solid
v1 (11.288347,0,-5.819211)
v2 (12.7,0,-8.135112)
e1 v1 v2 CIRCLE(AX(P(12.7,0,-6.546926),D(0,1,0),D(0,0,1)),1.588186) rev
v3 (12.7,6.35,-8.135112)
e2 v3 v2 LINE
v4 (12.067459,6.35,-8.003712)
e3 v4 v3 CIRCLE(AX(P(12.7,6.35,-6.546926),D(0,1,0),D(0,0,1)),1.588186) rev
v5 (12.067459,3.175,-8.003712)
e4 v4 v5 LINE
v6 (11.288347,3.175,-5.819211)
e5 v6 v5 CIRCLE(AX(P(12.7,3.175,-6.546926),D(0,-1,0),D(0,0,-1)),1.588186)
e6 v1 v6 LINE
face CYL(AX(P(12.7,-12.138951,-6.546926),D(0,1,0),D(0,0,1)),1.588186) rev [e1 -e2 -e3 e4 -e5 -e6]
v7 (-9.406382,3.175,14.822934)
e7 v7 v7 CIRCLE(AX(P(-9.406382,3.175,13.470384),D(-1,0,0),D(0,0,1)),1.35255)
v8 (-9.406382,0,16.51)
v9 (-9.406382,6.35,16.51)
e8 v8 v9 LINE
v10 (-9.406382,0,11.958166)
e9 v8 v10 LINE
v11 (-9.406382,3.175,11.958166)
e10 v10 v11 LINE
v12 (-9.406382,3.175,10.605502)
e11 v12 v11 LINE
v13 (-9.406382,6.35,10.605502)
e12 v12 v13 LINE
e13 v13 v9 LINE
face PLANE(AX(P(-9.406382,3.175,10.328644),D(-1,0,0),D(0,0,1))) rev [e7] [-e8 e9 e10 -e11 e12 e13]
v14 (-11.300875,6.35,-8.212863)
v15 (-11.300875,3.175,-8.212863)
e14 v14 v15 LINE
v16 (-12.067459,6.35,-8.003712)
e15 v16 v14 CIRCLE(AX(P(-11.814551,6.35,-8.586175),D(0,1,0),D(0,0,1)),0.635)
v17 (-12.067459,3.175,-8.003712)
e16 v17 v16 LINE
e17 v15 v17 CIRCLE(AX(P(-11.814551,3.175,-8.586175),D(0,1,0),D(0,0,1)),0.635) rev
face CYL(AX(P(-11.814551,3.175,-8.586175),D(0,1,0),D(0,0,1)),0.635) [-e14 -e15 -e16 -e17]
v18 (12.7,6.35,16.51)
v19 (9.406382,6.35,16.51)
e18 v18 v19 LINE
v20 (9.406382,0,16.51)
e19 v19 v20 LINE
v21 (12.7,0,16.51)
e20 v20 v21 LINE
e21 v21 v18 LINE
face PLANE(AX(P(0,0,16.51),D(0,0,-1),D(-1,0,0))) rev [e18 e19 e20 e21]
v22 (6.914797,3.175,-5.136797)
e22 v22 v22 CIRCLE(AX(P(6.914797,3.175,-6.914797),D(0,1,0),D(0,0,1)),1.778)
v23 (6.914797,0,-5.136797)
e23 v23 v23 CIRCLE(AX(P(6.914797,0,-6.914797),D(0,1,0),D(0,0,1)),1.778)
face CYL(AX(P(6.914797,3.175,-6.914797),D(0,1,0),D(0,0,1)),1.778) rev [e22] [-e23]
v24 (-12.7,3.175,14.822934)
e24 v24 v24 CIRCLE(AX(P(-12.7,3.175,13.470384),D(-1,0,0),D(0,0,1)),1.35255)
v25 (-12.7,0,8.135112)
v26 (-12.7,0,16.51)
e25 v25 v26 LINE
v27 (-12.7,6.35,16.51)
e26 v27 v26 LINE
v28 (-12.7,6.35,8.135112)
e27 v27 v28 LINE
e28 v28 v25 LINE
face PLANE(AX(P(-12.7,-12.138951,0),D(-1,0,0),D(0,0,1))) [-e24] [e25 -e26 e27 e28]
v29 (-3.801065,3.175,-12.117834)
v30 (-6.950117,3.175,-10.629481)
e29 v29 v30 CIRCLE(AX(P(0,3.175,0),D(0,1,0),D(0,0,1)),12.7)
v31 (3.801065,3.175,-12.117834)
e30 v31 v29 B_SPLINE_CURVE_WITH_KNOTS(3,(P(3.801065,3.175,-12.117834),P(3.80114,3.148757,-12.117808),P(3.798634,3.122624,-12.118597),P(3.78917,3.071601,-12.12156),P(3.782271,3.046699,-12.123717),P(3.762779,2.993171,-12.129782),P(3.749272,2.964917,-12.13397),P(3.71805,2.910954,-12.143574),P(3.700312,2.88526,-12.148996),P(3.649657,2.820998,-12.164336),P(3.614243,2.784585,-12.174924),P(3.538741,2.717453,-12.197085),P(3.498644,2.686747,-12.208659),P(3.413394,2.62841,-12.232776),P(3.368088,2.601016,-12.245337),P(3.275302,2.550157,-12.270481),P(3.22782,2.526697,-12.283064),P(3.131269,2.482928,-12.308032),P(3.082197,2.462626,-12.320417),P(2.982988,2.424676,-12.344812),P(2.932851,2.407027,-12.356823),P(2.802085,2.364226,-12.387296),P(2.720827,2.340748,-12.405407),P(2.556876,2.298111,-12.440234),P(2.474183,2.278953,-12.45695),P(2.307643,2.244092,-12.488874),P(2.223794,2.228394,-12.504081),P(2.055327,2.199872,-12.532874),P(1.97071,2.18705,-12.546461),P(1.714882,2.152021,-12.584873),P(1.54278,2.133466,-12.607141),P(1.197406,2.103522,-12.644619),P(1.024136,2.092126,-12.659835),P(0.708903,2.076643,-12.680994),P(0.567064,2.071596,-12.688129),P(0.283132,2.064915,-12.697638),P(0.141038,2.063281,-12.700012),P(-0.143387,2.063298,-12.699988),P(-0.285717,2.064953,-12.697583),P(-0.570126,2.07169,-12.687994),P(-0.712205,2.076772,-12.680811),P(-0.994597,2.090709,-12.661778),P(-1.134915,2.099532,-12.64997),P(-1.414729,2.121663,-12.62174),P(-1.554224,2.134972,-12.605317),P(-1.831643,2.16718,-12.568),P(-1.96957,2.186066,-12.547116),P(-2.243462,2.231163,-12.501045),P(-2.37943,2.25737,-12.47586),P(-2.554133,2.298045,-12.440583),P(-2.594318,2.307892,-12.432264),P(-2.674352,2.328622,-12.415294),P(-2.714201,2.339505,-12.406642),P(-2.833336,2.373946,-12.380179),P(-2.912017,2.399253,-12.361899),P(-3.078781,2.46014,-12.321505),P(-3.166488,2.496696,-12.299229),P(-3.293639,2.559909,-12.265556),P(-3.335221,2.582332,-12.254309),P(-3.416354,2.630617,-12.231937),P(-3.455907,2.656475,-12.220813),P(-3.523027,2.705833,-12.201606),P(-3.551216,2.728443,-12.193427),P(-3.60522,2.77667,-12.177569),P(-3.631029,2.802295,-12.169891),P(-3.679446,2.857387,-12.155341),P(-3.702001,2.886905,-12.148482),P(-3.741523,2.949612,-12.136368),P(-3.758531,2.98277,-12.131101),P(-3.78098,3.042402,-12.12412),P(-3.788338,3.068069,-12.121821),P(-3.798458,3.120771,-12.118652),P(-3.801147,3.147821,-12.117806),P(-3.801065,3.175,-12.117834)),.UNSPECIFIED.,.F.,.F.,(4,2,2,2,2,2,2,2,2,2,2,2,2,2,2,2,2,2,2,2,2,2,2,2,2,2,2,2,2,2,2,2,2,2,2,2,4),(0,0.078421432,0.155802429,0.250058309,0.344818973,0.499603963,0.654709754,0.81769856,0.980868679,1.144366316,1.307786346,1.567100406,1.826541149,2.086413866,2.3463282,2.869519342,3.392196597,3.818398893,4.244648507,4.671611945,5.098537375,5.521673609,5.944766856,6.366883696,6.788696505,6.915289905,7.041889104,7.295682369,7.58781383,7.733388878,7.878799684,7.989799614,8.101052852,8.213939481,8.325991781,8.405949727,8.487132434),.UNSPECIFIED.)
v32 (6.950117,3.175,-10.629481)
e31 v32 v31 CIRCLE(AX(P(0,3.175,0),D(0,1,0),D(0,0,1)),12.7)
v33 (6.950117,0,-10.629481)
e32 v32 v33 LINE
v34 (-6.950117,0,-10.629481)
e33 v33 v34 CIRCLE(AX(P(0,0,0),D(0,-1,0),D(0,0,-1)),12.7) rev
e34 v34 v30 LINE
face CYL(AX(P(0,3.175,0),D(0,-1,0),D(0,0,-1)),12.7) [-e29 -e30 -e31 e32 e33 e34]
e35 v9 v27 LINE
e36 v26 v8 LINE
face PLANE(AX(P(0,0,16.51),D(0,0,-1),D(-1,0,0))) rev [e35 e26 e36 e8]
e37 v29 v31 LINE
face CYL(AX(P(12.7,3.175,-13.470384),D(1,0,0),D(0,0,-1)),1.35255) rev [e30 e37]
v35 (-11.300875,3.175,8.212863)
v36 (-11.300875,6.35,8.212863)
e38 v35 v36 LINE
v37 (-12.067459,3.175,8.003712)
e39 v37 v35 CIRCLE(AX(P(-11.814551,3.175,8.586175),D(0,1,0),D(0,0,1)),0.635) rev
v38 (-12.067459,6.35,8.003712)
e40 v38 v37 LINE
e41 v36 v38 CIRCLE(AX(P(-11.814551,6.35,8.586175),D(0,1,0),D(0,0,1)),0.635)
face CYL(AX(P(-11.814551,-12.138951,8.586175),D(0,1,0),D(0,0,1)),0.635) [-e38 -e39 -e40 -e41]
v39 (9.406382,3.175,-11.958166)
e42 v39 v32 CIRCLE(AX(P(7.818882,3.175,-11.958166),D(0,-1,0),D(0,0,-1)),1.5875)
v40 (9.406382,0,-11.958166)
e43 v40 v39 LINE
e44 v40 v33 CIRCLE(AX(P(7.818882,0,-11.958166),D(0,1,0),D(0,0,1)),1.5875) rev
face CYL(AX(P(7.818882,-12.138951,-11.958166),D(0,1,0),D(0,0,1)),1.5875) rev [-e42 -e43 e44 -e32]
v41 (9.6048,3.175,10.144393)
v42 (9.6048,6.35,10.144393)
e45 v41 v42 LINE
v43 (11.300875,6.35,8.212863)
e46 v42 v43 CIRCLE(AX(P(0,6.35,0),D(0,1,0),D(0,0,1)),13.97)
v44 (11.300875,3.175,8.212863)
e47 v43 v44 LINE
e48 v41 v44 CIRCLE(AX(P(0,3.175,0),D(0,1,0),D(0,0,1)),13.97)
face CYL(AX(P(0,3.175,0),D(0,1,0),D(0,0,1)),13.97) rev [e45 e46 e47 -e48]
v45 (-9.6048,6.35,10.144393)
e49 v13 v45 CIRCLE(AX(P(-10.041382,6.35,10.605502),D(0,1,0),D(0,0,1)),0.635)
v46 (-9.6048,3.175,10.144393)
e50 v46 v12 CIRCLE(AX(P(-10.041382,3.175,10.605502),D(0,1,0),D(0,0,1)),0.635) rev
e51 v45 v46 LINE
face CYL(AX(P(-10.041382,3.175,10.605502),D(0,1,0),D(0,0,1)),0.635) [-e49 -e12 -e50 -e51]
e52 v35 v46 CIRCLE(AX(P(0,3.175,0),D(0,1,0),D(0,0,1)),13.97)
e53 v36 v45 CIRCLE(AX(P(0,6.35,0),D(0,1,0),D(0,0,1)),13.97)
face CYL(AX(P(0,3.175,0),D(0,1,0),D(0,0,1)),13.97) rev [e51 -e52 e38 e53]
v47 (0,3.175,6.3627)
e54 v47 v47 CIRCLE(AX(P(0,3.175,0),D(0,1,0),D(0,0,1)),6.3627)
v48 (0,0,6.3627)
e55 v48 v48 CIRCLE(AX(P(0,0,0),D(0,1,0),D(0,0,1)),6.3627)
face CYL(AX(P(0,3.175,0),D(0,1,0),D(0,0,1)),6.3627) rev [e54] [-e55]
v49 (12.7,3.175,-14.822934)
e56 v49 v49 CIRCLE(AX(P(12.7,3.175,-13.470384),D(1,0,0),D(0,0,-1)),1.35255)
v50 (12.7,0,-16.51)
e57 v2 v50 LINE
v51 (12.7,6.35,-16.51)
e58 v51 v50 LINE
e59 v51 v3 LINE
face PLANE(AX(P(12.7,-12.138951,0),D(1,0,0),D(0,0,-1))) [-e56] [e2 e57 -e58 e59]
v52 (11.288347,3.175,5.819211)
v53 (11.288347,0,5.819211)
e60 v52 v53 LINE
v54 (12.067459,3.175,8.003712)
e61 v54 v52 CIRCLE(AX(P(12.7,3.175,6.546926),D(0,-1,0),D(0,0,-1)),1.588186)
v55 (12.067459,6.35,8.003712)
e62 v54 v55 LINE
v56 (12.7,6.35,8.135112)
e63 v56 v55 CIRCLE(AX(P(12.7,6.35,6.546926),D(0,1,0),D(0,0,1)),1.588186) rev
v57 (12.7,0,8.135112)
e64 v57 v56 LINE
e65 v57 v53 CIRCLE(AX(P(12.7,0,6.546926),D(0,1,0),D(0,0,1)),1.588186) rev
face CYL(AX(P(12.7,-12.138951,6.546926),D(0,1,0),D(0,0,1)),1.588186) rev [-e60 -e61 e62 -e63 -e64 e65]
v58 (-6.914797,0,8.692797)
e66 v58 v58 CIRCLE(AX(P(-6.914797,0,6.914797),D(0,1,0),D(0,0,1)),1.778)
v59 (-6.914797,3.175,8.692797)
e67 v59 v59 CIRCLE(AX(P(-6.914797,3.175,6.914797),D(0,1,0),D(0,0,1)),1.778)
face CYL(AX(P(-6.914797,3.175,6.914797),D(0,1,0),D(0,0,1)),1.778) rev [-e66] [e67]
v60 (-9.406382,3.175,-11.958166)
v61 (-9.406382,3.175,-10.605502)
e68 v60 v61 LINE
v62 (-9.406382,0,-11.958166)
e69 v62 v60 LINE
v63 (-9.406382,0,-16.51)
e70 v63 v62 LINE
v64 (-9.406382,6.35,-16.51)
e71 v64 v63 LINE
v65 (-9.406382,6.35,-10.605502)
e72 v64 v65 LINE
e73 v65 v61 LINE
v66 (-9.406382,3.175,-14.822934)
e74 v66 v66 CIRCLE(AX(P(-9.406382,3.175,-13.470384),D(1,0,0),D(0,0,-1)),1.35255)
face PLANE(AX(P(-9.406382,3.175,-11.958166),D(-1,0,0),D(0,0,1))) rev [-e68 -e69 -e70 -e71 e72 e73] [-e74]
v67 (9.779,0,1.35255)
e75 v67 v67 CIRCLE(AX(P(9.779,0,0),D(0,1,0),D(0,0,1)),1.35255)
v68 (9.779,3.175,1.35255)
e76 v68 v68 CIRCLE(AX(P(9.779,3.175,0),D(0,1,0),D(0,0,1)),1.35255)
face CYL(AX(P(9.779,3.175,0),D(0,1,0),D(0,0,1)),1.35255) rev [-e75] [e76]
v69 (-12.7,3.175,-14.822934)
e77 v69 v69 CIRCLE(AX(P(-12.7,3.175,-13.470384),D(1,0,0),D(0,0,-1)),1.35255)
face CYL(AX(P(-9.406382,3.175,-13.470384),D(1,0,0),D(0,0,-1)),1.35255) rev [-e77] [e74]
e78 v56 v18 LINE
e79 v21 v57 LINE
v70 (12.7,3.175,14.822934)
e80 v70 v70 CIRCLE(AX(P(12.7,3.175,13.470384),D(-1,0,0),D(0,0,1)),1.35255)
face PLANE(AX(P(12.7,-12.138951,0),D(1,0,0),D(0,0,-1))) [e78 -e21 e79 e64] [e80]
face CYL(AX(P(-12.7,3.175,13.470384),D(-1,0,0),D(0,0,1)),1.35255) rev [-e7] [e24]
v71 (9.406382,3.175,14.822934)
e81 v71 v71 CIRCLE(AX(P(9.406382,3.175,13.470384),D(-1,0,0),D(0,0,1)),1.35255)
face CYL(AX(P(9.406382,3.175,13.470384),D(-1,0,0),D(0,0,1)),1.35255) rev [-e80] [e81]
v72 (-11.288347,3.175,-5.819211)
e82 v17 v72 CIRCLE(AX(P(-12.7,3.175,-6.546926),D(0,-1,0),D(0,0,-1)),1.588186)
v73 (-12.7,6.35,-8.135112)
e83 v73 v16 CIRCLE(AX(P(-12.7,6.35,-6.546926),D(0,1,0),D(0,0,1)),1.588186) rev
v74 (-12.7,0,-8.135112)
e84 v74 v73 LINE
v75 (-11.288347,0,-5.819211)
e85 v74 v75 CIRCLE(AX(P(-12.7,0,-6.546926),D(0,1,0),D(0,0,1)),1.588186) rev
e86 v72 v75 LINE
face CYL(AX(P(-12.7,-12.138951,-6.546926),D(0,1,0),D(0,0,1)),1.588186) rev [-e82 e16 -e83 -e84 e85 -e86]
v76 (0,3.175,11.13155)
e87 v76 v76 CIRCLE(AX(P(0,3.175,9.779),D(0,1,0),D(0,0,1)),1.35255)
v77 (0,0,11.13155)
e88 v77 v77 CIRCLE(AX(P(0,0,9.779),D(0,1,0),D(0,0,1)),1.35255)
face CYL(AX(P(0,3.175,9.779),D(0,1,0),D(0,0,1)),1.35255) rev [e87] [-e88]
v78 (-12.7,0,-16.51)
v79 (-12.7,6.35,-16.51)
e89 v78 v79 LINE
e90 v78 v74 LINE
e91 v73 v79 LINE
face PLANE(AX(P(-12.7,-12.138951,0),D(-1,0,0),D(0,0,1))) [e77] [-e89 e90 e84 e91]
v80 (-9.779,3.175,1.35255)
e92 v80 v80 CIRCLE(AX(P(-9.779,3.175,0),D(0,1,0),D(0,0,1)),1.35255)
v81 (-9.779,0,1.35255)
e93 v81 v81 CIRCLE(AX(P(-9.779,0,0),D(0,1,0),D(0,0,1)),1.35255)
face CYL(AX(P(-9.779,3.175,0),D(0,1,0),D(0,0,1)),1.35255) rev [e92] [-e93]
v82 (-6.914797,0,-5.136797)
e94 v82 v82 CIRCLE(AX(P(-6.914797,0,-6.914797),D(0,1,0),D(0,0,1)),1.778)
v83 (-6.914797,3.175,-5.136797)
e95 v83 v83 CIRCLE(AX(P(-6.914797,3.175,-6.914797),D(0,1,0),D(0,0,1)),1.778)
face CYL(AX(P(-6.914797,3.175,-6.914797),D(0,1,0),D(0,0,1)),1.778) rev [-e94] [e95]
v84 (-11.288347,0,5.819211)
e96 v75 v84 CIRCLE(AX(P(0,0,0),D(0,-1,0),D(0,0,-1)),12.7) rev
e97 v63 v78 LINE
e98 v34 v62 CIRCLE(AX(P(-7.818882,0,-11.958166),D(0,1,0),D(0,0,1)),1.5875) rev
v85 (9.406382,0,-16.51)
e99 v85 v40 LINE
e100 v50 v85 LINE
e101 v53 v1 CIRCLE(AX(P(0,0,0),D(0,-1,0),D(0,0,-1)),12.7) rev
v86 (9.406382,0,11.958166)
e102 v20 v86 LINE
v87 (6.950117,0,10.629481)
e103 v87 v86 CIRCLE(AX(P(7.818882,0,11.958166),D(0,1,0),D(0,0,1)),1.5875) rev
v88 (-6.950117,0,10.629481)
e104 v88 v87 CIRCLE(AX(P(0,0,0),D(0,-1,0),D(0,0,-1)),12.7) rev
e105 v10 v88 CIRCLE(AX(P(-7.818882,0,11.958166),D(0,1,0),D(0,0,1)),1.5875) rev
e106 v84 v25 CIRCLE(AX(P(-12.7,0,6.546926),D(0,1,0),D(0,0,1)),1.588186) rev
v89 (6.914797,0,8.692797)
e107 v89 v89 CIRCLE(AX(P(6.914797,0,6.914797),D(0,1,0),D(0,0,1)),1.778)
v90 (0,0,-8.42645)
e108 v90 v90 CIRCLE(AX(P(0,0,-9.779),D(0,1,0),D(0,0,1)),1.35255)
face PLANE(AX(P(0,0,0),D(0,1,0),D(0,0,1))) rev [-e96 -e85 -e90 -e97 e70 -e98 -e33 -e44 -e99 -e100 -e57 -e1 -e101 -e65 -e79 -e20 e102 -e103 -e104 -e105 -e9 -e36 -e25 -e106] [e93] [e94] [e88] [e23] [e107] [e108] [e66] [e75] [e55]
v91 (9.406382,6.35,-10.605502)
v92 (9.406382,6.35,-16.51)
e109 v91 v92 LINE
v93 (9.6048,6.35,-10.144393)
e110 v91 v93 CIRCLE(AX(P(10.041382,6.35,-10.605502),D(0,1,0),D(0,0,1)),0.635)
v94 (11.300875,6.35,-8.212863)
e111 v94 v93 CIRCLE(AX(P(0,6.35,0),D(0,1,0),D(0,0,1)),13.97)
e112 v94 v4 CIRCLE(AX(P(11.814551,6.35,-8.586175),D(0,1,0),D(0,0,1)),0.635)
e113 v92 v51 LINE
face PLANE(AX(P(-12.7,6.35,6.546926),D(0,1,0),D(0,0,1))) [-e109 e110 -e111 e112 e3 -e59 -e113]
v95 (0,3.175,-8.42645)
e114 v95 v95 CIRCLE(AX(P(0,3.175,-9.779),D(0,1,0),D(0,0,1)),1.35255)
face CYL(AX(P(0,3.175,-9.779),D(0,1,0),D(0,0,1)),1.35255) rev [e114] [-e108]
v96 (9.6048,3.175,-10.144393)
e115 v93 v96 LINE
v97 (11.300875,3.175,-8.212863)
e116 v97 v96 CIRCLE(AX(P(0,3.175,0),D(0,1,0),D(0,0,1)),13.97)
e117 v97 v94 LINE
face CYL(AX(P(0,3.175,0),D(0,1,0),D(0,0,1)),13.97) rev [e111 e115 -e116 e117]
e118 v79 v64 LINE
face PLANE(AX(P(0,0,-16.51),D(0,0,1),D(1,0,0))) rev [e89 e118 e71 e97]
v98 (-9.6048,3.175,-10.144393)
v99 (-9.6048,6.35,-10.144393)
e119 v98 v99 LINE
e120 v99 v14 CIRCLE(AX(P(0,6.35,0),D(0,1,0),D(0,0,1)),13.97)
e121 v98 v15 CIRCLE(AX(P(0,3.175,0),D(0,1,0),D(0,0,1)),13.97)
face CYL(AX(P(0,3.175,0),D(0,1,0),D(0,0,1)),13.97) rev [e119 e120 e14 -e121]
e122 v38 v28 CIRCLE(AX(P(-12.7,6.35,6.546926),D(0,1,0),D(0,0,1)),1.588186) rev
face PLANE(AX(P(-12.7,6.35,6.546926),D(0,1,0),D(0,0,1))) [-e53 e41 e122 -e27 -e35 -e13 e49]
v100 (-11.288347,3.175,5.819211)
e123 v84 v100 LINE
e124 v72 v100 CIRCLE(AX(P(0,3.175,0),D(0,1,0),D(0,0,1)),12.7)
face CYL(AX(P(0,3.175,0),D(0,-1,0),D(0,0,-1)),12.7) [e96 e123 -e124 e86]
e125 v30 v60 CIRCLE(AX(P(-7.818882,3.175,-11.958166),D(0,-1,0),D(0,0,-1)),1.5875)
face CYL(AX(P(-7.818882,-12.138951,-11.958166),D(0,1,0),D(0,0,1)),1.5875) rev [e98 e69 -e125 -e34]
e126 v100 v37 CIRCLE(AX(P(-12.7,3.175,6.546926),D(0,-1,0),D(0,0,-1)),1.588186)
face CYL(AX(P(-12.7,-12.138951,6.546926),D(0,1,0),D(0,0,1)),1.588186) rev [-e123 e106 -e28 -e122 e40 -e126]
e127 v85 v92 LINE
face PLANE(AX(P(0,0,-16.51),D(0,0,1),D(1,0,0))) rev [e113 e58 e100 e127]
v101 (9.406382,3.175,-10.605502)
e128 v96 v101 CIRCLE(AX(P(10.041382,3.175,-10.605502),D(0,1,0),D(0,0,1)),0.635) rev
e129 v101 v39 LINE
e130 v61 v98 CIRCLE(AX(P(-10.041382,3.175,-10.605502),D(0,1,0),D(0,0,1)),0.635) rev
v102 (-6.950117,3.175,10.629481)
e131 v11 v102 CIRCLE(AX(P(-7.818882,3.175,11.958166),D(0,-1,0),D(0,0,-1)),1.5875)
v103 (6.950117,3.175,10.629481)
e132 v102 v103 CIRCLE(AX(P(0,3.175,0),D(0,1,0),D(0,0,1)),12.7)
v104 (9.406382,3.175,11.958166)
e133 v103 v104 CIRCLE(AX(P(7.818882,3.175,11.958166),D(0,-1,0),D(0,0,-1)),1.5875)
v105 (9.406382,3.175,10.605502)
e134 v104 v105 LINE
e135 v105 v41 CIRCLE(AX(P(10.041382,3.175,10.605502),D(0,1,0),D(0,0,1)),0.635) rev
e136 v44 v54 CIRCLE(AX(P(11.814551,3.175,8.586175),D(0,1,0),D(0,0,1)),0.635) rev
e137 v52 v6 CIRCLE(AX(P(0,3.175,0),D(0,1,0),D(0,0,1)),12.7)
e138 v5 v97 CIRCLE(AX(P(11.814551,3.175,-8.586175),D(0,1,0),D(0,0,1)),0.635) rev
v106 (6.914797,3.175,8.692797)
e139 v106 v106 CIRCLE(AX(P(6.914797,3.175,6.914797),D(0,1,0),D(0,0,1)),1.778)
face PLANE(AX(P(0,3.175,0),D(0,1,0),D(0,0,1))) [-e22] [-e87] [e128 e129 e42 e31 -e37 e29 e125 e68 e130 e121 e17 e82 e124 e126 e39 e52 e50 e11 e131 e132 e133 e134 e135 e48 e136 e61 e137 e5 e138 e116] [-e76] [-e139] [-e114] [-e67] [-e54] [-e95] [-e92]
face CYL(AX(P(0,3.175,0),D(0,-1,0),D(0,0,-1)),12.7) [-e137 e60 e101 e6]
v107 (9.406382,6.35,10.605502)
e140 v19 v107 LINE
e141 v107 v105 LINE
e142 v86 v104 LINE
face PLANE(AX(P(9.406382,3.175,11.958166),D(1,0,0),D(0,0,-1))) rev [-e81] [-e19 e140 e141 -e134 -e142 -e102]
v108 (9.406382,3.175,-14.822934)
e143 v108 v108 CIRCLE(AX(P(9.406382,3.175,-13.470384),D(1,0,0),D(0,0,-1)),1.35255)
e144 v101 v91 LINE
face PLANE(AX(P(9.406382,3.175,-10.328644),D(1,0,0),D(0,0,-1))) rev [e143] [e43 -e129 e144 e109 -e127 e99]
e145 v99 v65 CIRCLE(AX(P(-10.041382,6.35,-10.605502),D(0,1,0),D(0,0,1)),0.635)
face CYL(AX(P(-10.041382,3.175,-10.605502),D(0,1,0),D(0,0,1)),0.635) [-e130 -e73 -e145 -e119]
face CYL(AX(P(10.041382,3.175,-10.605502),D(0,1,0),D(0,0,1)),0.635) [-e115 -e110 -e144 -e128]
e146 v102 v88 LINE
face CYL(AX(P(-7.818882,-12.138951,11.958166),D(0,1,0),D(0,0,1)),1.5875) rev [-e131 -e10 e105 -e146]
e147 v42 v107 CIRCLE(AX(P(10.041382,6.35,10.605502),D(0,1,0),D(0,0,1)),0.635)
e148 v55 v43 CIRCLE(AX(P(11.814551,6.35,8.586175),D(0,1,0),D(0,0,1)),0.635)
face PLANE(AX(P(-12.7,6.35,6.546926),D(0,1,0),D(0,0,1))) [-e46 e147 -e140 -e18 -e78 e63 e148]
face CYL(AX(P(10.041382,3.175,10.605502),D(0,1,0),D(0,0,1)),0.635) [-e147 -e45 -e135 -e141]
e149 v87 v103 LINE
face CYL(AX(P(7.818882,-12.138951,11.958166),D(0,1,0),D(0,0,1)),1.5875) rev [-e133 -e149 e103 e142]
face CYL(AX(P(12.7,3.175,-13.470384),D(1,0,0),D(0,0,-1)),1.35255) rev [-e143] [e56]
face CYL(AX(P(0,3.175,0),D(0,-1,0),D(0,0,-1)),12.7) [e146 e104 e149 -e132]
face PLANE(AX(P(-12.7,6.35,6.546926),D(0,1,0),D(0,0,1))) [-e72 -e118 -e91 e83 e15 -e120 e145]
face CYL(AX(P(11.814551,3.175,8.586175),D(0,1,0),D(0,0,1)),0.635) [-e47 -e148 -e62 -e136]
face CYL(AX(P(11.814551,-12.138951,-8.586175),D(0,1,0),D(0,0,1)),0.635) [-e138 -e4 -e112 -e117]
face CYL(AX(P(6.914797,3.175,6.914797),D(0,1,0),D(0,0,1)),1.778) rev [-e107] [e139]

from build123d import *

# Parameters (mm, degrees)
CUT_EXTRUDE1_START         = -6.35
CUT_EXTRUDE1_DEPTH         = 3.175
CUT_EXTRUDE1_START_2       = -3.175
CUT_EXTRUDE1_2_DEPTH       = 3.175
SKETCH2_W                  = 3.293618
SKETCH2_H                  = 6.35
BOSS_EXTRUDE1_DEPTH        = 4.551833731
SKETCH3_W                  = 3.293618
SKETCH3_H                  = 6.35
BOSS_EXTRUDE2_DEPTH        = 4.551833731
SKETCH4_W                  = 3.293618
SKETCH4_H                  = 6.35
BOSS_EXTRUDE3_DEPTH        = 4.551833731
SKETCH5_W                  = 3.293618
SKETCH5_H                  = 6.35
BOSS_EXTRUDE4_DEPTH        = 4.551833731
HOLE1_D                    = 12.7254
M2_5_CLEARANCE_HOLE1_D     = 2.7051
M3_CLEARANCE_HOLE1_D       = 3.556
M2_5_CLEARANCE_HOLE2_D     = 2.7051
M2_5_CLEARANCE_HOLE2_DEPTH = 3.293618
M2_5_CLEARANCE_HOLE3_D     = 2.7051
M2_5_CLEARANCE_HOLE3_DEPTH = 3.293618
M2_5_CLEARANCE_HOLE4_D     = 2.7051
M2_5_CLEARANCE_HOLE4_DEPTH = 25.4
M2_5_CLEARANCE_HOLE5_D     = 2.7051
M2_5_CLEARANCE_HOLE5_DEPTH = 3.293618
FILLET1_R                  = 0.635


with BuildPart() as part:
    # Cut-Extrude1: read off the stored shape, not the designer's step
    # Cut-Extrude1 outline → Cut-Extrude1 (new body)
    with BuildSketch(Plane(origin=(0, 6.35, 0), x_dir=(-1, 0, 0), z_dir=(0, 1, 0)).offset(CUT_EXTRUDE1_START)):
        with BuildLine():
            ThreePointArc((-12.7, 8.135112), (-11.343887812, 7.373541875), (-11.288347253, 5.819210969))
            ThreePointArc((-11.288347253, 5.819210969), (-12.7, 0), (-11.288347253, -5.819210969))
            ThreePointArc((-11.288347253, -5.819210969), (-11.343887812, -7.373541875), (-12.7, -8.135112))
            Line((-12.7, -8.135112), (-12.7, -11.958166269))
            Line((-12.7, -11.958166269), (-9.406382, -11.958166269))
            ThreePointArc((-9.406382, -11.958166269), (-8.574193969, -10.561863981), (-6.950117333, -10.629481128))
            ThreePointArc((-6.950117333, -10.629481128), (0, -12.7), (6.950117333, -10.629481128))
            ThreePointArc((6.950117333, -10.629481128), (8.574193969, -10.561863981), (9.406382, -11.958166269))
            Line((9.406382, -11.958166269), (12.7, -11.958166269))
            Line((12.7, -11.958166269), (12.7, -8.135112))
            ThreePointArc((12.7, -8.135112), (11.343887812, -7.373541875), (11.288347253, -5.819210969))
            ThreePointArc((11.288347253, -5.819210969), (12.7, 0), (11.288347253, 5.819210969))
            ThreePointArc((11.288347253, 5.819210969), (11.343887812, 7.373541875), (12.7, 8.135112))
            Line((12.7, 8.135112), (12.7, 11.958166269))
            Line((12.7, 11.958166269), (9.406382, 11.958166269))
            ThreePointArc((9.406382, 11.958166269), (8.574193969, 10.561863981), (6.950117333, 10.629481128))
            ThreePointArc((6.950117333, 10.629481128), (0, 12.7), (-6.950117333, 10.629481128))
            ThreePointArc((-6.950117333, 10.629481128), (-8.574193969, 10.561863981), (-9.406382, 11.958166269))
            Line((-9.406382, 11.958166269), (-12.7, 11.958166269))
            Line((-12.7, 11.958166269), (-12.7, 8.135112))
        make_face()
    extrude(amount=CUT_EXTRUDE1_DEPTH)

    # Cut-Extrude1 2 outline → Cut-Extrude1 2 (add)
    with BuildSketch(Plane(origin=(0, 6.35, 0), x_dir=(-1, 0, 0), z_dir=(0, 1, 0)).offset(CUT_EXTRUDE1_START_2)):
        with BuildLine():
            Line((-9.406382, 10.328643554), (-9.406382, 11.958166269))
            Line((-9.406382, 11.958166269), (-12.7, 11.958166269))
            Line((-12.7, 11.958166269), (-12.7, 8.135112))
            ThreePointArc((-12.7, 8.135112), (-12.131266538, 8.02978706), (-11.637967358, 7.727782073))
            ThreePointArc((-11.637967358, 7.727782073), (-10.602229958, 9.096901665), (-9.406382, 10.328643554))
        make_face()
        with BuildLine():
            Line((12.7, 11.958166269), (9.406382, 11.958166269))
            Line((9.406382, 11.958166269), (9.406382, 10.328643554))
            ThreePointArc((9.406382, 10.328643554), (10.602229958, 9.096901665), (11.637967358, 7.727782073))
            ThreePointArc((11.637967358, 7.727782073), (12.131266538, 8.02978706), (12.7, 8.135112))
            Line((12.7, 8.135112), (12.7, 11.958166269))
        make_face()
        with BuildLine():
            ThreePointArc((-9.406382, -10.328643554), (-10.602229958, -9.096901665), (-11.637967358, -7.727782073))
            ThreePointArc((-11.637967358, -7.727782073), (-12.131266538, -8.02978706), (-12.7, -8.135112))
            Line((-12.7, -8.135112), (-12.7, -11.958166269))
            Line((-12.7, -11.958166269), (-9.406382, -11.958166269))
            Line((-9.406382, -11.958166269), (-9.406382, -10.328643554))
        make_face()
        with BuildLine():
            ThreePointArc((12.7, -8.135112), (12.131266538, -8.02978706), (11.637967358, -7.727782073))
            ThreePointArc((11.637967358, -7.727782073), (10.602229958, -9.096901665), (9.406382, -10.328643554))
            Line((9.406382, -10.328643554), (9.406382, -11.958166269))
            Line((9.406382, -11.958166269), (12.7, -11.958166269))
            Line((12.7, -11.958166269), (12.7, -8.135112))
        make_face()
    extrude(amount=CUT_EXTRUDE1_2_DEPTH)

    # Sketch2 → Boss-Extrude1 (add)
    with BuildSketch(Plane(origin=(0, 0, -11.958166269), x_dir=(-1, 0, 0), z_dir=(0, 0, -1))):
        with Locations((11.053191, 3.175)):
            Rectangle(SKETCH2_W, SKETCH2_H)
    extrude(amount=BOSS_EXTRUDE1_DEPTH)

    # Sketch3 → Boss-Extrude2 (add)
    with BuildSketch(Plane(origin=(0, 0, -11.958166269), x_dir=(-1, 0, 0), z_dir=(0, 0, -1))):
        with Locations((-11.053191, 3.175)):
            Rectangle(SKETCH3_W, SKETCH3_H)
    extrude(amount=BOSS_EXTRUDE2_DEPTH)

    # Sketch4 → Boss-Extrude3 (add)
    with BuildSketch(Plane.XY.offset(11.958166269)):
        with Locations((11.053191, 3.175)):
            Rectangle(SKETCH4_W, SKETCH4_H)
    extrude(amount=BOSS_EXTRUDE3_DEPTH)

    # Sketch5 → Boss-Extrude4 (add)
    with BuildSketch(Plane.XY.offset(11.958166269)):
        with Locations((-11.053191, 3.175)):
            Rectangle(SKETCH5_W, SKETCH5_H)
    extrude(amount=BOSS_EXTRUDE4_DEPTH)

    # Hole1 (through all)
    with Locations(Plane(origin=(0, 3.175, 0), x_dir=(1, 0, 0), z_dir=(0, 1, 0))):
        with Locations((0, 0)):
            Hole(HOLE1_D / 2)

    # M2.5 Clearance Hole1 (through all)
    with Locations(Plane(origin=(0, 3.175, 0), x_dir=(1, 0, 0), z_dir=(0, 1, 0))):
        with Locations((0, -9.779), (-9.779, 0), (0, 9.779), (9.779, 0)):
            Hole(M2_5_CLEARANCE_HOLE1_D / 2)

    # M3 Clearance Hole1 (through all)
    with Locations(Plane(origin=(0, 3.175, 0), x_dir=(1, 0, 0), z_dir=(0, 1, 0))):
        with Locations((-6.914797213, -6.914797213), (-6.914797213, 6.914797213), (6.914797213, 6.914797213), (6.914797213, -6.914797213)):
            Hole(M3_CLEARANCE_HOLE1_D / 2)

    # M2.5 Clearance Hole2
    with Locations(Plane.ZY.offset(12.7)):
        with Locations((13.470384182, 3.175)):
            Hole(M2_5_CLEARANCE_HOLE2_D / 2, depth=M2_5_CLEARANCE_HOLE2_DEPTH)

    # M2.5 Clearance Hole3
    with Locations(Plane(origin=(-9.406382, 0, 0), x_dir=(0, 0, -1), z_dir=(1, 0, 0))):
        with Locations((13.470384182, 3.175)):
            Hole(M2_5_CLEARANCE_HOLE3_D / 2, depth=M2_5_CLEARANCE_HOLE3_DEPTH)

    # M2.5 Clearance Hole4
    with Locations(Plane(origin=(12.7, 0, 0), x_dir=(0, 0, -1), z_dir=(1, 0, 0))):
        with Locations((13.470384182, 3.175)):
            Hole(M2_5_CLEARANCE_HOLE4_D / 2, depth=M2_5_CLEARANCE_HOLE4_DEPTH)

    # M2.5 Clearance Hole5
    with Locations(Plane.ZY.offset(-9.406382)):
        with Locations((13.470384182, 3.175)):
            Hole(M2_5_CLEARANCE_HOLE5_D / 2, depth=M2_5_CLEARANCE_HOLE5_DEPTH)

    # Fillet1
    # the kernel refuses this fillet: 0.635 mm, written as the material it takes off along each edge
    with BuildSketch(Plane(origin=(-9.406382, 3.175, 10.328643554), x_dir=(0, 0, 1), z_dir=(0, 1, 0)), Plane(origin=(9.406382, 3.175, -10.328643554), x_dir=(0, 0, -1), z_dir=(0, 1, 0))) as fillet1_piece_1:
        with BuildLine():
            CenterArc((0.276858439, -0.635), FILLET1_R, 90, 46.565062077)
            ThreePointArc((-0.184250343, -0.198418174), (-0.091644431, -0.0996555), (0, 0))
            Line((0, 0), (0.276858439, 0))
        make_face()
    extrude(amount=3.867146097, mode=Mode.SUBTRACT)
    with BuildSketch(Plane(origin=(-11.637967358, 3.175, -7.727782073), x_dir=(0.5706588735868443, 0, -0.8211872198205438), z_dir=(0, 1, 0)), Plane(origin=(11.637967358, 3.175, 7.727782073), x_dir=(-0.5706588735868443, 0, 0.8211872198205438), z_dir=(0, 1, 0))) as fillet1_piece_2:
        with BuildLine():
            CenterArc((0.604132084, 0.634858067), FILLET1_R, 191.325534433, 77.463029076)
            ThreePointArc((-0.018502711, 0.51015477), (0.011380109, 0.255825664), (0, 0))
            ThreePointArc((0, 0), (0.295353463, 0.003122527), (0.590706926, 0))
        make_face()
    extrude(amount=4.651767316, mode=Mode.SUBTRACT)
    with BuildSketch(Plane(origin=(-9.406382, 3.175, -10.328643554), x_dir=(0, 0, -1), z_dir=(0, 1, 0)), Plane(origin=(9.406382, 3.175, 10.328643554), x_dir=(0, 0, 1), z_dir=(0, 1, 0))) as fillet1_piece_3:
        with BuildLine():
            CenterArc((0.276858439, 0.635), FILLET1_R, 223.434937923, 46.565062077)
            ThreePointArc((-0.184250343, 0.198418174), (-0.091644431, 0.0996555), (0, 0))
            Line((0, 0), (0.276858439, 0))
        make_face()
    extrude(amount=3.867146097, mode=Mode.SUBTRACT)
    with BuildSketch(Plane(origin=(-11.637967358, 3.175, 7.727782073), x_dir=(0.5706588735868457, 0, 0.8211872198205425), z_dir=(0, 1, 0)), Plane(origin=(11.637967358, 3.175, -7.727782073), x_dir=(-0.5706588735868457, 0, -0.8211872198205425), z_dir=(0, 1, 0))) as fillet1_piece_4:
        with BuildLine():
            CenterArc((0.604132084, -0.634858067), FILLET1_R, 91.211436491, 77.463029076)
            ThreePointArc((-0.018502711, -0.51015477), (0.011380109, -0.255825664), (0, 0))
            ThreePointArc((0, 0), (0.295353463, -0.003122527), (0.590706926, 0))
        make_face()
    extrude(amount=4.651767316, mode=Mode.SUBTRACT)


solid = part.part
